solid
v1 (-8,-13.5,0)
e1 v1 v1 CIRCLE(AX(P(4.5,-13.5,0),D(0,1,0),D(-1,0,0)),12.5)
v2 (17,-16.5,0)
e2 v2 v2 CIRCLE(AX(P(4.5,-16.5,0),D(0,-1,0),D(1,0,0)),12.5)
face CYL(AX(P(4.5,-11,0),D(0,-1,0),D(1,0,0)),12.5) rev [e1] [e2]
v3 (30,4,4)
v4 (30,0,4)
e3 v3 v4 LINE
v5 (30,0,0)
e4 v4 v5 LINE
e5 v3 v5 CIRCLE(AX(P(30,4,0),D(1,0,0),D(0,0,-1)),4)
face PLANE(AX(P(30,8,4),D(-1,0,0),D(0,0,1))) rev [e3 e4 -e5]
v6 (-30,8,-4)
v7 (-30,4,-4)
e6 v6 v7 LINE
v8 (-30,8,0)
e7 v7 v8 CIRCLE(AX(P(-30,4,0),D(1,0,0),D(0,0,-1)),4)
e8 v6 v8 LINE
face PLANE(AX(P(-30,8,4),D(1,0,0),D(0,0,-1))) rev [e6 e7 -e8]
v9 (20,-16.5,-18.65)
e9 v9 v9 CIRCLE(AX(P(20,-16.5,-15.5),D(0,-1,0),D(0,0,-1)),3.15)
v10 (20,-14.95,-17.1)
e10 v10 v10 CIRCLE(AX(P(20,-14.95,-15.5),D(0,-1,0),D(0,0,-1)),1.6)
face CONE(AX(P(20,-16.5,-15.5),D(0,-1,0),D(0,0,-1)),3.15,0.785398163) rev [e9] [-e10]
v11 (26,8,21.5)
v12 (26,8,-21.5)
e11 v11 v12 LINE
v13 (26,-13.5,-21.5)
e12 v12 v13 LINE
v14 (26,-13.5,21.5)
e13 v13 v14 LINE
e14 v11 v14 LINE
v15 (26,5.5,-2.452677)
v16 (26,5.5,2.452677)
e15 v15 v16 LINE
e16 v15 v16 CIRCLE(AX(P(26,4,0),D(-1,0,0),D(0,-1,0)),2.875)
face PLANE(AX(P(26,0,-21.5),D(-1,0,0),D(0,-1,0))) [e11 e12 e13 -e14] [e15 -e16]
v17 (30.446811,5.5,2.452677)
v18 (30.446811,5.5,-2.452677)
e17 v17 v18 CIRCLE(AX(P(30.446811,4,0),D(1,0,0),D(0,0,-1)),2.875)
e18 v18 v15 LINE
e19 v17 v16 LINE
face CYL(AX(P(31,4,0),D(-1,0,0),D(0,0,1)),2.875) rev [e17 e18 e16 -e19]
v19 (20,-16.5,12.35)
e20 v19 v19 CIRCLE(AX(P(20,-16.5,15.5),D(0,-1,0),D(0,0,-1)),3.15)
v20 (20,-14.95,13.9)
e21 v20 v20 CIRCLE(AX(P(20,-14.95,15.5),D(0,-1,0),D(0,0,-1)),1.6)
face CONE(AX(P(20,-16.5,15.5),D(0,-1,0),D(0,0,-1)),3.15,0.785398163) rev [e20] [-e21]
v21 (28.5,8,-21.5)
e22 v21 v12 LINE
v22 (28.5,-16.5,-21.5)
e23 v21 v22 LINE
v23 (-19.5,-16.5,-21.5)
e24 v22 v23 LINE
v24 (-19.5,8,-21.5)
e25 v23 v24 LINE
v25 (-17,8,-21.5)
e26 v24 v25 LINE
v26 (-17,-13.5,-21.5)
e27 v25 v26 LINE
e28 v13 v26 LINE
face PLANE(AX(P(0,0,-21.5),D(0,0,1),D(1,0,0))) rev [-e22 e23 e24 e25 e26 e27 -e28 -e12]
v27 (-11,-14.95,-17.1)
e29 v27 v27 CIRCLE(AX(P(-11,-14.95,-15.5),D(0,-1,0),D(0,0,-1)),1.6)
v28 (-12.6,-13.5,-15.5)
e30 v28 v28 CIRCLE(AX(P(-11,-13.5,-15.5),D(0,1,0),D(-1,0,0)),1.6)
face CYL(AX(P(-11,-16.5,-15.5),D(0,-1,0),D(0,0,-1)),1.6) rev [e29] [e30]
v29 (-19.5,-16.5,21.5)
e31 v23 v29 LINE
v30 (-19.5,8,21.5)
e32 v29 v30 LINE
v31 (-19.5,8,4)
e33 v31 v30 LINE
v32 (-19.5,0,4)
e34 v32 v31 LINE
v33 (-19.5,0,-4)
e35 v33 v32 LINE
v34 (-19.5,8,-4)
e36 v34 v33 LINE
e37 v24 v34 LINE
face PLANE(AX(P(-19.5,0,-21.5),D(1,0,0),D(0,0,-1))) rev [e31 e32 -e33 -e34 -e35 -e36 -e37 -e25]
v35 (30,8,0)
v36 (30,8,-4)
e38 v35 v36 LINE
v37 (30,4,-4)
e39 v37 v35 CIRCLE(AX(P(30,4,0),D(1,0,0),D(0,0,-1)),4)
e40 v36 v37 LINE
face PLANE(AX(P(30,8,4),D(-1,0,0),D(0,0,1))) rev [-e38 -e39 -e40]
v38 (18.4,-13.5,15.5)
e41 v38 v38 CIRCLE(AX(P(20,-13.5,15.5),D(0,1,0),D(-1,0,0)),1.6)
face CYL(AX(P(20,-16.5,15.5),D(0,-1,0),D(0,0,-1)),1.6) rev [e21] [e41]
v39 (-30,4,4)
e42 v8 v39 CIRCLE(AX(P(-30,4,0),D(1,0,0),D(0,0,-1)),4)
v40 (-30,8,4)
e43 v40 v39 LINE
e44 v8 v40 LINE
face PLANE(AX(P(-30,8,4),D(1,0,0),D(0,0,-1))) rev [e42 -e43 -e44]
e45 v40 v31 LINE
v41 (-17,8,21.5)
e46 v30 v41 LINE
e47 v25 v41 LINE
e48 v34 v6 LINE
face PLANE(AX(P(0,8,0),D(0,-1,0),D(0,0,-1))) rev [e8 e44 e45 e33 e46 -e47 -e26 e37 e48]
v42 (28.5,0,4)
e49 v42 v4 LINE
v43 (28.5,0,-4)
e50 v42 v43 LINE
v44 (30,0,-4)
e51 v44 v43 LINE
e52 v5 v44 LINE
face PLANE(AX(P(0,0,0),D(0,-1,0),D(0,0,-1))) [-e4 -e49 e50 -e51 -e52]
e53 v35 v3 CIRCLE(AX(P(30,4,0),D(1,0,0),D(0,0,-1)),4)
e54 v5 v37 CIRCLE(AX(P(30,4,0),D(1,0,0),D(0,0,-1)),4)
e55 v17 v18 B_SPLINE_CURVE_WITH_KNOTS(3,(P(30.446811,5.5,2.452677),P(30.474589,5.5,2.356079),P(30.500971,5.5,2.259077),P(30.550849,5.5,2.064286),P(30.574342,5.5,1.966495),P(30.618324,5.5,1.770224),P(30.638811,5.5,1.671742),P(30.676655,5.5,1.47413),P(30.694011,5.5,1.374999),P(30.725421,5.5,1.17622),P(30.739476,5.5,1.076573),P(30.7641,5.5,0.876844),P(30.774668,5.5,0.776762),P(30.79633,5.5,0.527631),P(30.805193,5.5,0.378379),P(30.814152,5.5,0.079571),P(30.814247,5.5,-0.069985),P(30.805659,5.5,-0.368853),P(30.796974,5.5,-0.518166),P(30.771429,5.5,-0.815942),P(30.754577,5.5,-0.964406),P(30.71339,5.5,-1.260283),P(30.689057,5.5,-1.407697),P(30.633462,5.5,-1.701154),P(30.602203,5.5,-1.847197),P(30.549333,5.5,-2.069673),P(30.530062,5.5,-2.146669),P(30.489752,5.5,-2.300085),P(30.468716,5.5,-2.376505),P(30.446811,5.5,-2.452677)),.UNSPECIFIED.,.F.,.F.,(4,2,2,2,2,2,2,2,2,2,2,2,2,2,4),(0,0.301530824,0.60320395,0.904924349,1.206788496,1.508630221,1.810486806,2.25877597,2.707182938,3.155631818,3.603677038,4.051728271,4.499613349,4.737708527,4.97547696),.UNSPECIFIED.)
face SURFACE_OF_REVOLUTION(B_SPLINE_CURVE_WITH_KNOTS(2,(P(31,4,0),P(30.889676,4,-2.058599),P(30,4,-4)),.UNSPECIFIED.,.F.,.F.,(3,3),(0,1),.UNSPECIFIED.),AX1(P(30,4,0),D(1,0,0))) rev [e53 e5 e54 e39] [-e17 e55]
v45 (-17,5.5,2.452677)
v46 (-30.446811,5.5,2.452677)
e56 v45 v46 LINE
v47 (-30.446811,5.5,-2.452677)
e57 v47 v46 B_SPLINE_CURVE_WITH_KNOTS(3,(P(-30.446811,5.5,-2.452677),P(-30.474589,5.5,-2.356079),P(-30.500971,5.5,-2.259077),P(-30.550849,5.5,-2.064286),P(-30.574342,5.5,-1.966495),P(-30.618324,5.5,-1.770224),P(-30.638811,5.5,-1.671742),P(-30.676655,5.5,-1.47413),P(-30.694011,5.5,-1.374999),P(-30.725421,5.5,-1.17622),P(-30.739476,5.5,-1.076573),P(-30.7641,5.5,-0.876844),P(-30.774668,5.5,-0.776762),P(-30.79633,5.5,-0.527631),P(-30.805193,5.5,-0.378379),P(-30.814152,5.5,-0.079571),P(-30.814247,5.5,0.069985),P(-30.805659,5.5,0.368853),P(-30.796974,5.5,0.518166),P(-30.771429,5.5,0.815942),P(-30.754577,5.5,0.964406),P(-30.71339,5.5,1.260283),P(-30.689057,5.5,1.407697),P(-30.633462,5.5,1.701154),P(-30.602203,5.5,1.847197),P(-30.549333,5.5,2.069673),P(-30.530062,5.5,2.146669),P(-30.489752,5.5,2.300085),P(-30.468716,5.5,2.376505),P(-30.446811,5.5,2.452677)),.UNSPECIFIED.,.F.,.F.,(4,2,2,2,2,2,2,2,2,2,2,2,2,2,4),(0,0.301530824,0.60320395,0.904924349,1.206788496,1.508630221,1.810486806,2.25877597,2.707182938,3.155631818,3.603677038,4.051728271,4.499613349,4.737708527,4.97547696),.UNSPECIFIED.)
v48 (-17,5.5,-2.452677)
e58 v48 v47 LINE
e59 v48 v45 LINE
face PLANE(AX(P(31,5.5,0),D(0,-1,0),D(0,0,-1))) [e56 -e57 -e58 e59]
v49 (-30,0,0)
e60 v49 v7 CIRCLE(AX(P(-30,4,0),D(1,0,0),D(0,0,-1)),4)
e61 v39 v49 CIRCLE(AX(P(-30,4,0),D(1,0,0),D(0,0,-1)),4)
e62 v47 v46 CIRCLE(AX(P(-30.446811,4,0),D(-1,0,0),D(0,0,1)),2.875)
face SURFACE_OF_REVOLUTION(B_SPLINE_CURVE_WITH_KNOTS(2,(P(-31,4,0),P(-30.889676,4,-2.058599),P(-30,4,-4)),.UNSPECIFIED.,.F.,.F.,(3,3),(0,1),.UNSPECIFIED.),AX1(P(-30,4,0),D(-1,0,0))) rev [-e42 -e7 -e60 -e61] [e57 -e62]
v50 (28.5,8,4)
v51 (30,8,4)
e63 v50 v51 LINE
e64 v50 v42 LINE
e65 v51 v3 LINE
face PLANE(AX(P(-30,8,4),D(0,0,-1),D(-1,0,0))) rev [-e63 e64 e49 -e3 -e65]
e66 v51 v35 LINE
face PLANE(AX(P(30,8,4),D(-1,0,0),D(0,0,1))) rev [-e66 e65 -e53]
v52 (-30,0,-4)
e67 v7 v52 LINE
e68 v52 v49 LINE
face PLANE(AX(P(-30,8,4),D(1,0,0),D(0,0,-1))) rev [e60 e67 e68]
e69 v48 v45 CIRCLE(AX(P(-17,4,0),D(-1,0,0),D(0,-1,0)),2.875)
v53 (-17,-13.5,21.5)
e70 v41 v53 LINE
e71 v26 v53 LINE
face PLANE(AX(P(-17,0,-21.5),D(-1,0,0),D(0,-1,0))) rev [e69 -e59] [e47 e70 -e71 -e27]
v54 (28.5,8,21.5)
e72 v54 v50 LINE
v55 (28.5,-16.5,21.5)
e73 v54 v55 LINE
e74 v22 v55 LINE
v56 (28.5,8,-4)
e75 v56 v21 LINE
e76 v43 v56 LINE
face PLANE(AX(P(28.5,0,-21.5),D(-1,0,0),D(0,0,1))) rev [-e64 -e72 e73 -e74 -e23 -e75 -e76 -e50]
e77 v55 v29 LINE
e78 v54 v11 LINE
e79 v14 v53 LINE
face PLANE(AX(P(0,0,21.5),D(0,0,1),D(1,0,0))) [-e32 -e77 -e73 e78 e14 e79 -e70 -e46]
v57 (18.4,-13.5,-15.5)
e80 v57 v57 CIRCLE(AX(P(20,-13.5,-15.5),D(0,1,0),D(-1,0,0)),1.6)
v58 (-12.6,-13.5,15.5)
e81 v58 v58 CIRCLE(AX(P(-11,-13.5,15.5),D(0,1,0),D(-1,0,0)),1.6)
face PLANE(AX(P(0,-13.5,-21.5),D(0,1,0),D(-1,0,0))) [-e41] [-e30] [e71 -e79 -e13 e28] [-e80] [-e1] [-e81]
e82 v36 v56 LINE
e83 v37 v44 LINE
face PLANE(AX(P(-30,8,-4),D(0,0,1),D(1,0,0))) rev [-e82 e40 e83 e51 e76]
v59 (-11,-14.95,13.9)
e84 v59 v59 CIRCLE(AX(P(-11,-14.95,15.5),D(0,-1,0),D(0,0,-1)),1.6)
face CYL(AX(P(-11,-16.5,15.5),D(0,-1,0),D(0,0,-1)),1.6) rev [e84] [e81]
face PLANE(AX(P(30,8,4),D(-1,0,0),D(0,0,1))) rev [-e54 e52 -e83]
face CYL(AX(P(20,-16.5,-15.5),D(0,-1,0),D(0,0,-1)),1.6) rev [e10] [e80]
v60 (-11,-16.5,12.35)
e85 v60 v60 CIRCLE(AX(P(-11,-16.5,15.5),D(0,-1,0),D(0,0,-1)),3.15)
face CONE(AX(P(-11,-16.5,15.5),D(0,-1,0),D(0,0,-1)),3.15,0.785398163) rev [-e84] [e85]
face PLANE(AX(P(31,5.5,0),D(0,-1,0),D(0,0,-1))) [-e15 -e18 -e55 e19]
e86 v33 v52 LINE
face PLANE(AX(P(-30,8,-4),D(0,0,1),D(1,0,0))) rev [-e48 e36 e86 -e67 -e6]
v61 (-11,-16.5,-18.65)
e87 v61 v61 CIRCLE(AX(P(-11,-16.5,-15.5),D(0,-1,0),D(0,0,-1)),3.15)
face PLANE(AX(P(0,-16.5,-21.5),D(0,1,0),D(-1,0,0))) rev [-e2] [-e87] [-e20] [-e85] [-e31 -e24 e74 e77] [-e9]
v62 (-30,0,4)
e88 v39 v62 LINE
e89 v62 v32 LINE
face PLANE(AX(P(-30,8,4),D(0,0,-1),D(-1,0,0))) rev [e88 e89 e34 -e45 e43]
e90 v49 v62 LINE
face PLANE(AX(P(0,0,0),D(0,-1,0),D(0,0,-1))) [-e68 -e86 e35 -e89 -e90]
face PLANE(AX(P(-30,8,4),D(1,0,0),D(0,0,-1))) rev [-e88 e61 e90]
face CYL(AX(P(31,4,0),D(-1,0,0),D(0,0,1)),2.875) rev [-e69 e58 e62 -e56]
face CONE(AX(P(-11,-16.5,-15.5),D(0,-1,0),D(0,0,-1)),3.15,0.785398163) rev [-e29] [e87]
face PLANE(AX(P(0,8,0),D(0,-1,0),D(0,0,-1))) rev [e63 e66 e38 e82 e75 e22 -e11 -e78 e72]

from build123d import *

# Parameters (mm, degrees)
SKETCH1_W                                           = 60
SKETCH1_H                                           = 8
BOSS_EXTRUDE1_DEPTH                                 = 8
BOSS_EXTRUDE2_DEPTH                                 = 17.5
BOSS_EXTRUDE2_DEPTH_BACK                            = 25.5
SKETCH5_W                                           = 43
SKETCH5_H                                           = 8
CUT_EXTRUDE2_DEPTH                                  = 17.5
SKETCH6_W                                           = 43
SKETCH6_H                                           = 8
BOSS_EXTRUDE3_DEPTH                                 = 2.5
SKETCH7_W                                           = 43
SKETCH7_H                                           = 8
BOSS_EXTRUDE4_DEPTH                                 = 2.5
CSK_FOR_M3_COUNTERSUNK_FLAT_HEAD_SCREW1_D           = 3.2
CSK_FOR_M3_COUNTERSUNK_FLAT_HEAD_SCREW1_CSINK_D     = 6.3
CSK_FOR_M3_COUNTERSUNK_FLAT_HEAD_SCREW1_CSINK_ANGLE = 90
SKETCH15_R                                          = 12.5
CUT_EXTRUDE3_DEPTH                                  = 5.5
CUT_EXTRUDE1_START                                  = -62.0000001
CUT_EXTRUDE1_DEPTH                                  = 62.0000001


with BuildPart() as part:
    # Sketch1 → Boss-Extrude1 (new body)
    with BuildSketch(Plane(origin=(0, 0, 0), x_dir=(1, 0, 0), z_dir=(0, 1, 0))):
        Rectangle(SKETCH1_W, SKETCH1_H)
    extrude(amount=BOSS_EXTRUDE1_DEPTH)

    # Sketch2 → Revolve1 (revolve)
    with BuildSketch(Plane(origin=(0, 4, 0), x_dir=(1, 0, 0), z_dir=(0, 1, 0))):
        with BuildLine():
            Line((30, 4), (30, 0))
            Line((30, 0), (31, 0))
            add(Edge.make_bspline(
                [(30, 4), (30.889676148, 2.05859871), (31, 0)],
                knots=[0, 0, 0, 1, 1, 1], degree=2))
        make_face()
    revolve1 = revolve(axis=Axis((30, 4, 0), (-1, 0, 0)))

    # Mirror1: Revolve1 across plane
    add(revolve1.mirror(Plane.ZY))

    # Sketch4 → Boss-Extrude2 (add, two sides: drawn at the far end of the back side and taken through both)
    with BuildSketch(Plane.XY.offset(4).offset(-BOSS_EXTRUDE2_DEPTH_BACK)):
        Polygon((28.5, 0), (26, 0), (26, -13.5), (-17, -13.5), (-17, 0), (-19.5, 0), (-19.5, -16.5), (28.5, -16.5), align=None)
    extrude(amount=BOSS_EXTRUDE2_DEPTH + BOSS_EXTRUDE2_DEPTH_BACK)

    # Sketch5 → Cut-Extrude2 (cut)
    with BuildSketch(Plane(origin=(0, 8, 0), x_dir=(1, 0, 0), z_dir=(0, 1, 0))):
        with Locations((4.5, 0)):
            Rectangle(SKETCH5_W, SKETCH5_H)
    extrude(amount=-CUT_EXTRUDE2_DEPTH, mode=Mode.SUBTRACT)

    # Sketch6 → Boss-Extrude3 (add)
    with BuildSketch(Plane.ZY.offset(-26)):
        with Locations((0, 4)):
            Rectangle(SKETCH6_W, SKETCH6_H)
    extrude(amount=-BOSS_EXTRUDE3_DEPTH)

    # Sketch7 → Boss-Extrude4 (add)
    with BuildSketch(Plane(origin=(-17, 0, 0), x_dir=(0, 0, -1), z_dir=(1, 0, 0))):
        with Locations((0, 4)):
            Rectangle(SKETCH7_W, SKETCH7_H)
    extrude(amount=-BOSS_EXTRUDE4_DEPTH)

    # CSK for M3 Countersunk Flat Head Screw1 (through all)
    with Locations(Plane(origin=(0, -16.5, 0), x_dir=(-1, 0, 0), z_dir=(0, -1, 0))):
        with Locations((11, -15.5), (-20, -15.5), (-20, 15.5), (11, 15.5)):
            CounterSinkHole(CSK_FOR_M3_COUNTERSUNK_FLAT_HEAD_SCREW1_D / 2, CSK_FOR_M3_COUNTERSUNK_FLAT_HEAD_SCREW1_CSINK_D / 2, counter_sink_angle=CSK_FOR_M3_COUNTERSUNK_FLAT_HEAD_SCREW1_CSINK_ANGLE)

    # Sketch15 → Cut-Extrude3 (cut)
    with BuildSketch(Plane(origin=(0, -16.5, 0), x_dir=(-1, 0, 0), z_dir=(0, -1, 0))):
        with Locations(Location((-4.5, 0, 0), (0, 0, 180))):
            Circle(SKETCH15_R)
    extrude(amount=-CUT_EXTRUDE3_DEPTH, mode=Mode.SUBTRACT)

    # Cut-Extrude1: read off the stored shape, not the designer's step
    # Cut-Extrude1 outline → Cut-Extrude1 (cut)
    with BuildSketch(Plane.ZY.offset(31).offset(CUT_EXTRUDE1_START)):
        with BuildLine():
            Line((2.452677109, 5.5), (-2.452677109, 5.5))
            ThreePointArc((-2.452677109, 5.5), (0, 1.125), (2.452677109, 5.5))
        make_face()
    extrude(amount=CUT_EXTRUDE1_DEPTH, mode=Mode.SUBTRACT)


solid = part.part
